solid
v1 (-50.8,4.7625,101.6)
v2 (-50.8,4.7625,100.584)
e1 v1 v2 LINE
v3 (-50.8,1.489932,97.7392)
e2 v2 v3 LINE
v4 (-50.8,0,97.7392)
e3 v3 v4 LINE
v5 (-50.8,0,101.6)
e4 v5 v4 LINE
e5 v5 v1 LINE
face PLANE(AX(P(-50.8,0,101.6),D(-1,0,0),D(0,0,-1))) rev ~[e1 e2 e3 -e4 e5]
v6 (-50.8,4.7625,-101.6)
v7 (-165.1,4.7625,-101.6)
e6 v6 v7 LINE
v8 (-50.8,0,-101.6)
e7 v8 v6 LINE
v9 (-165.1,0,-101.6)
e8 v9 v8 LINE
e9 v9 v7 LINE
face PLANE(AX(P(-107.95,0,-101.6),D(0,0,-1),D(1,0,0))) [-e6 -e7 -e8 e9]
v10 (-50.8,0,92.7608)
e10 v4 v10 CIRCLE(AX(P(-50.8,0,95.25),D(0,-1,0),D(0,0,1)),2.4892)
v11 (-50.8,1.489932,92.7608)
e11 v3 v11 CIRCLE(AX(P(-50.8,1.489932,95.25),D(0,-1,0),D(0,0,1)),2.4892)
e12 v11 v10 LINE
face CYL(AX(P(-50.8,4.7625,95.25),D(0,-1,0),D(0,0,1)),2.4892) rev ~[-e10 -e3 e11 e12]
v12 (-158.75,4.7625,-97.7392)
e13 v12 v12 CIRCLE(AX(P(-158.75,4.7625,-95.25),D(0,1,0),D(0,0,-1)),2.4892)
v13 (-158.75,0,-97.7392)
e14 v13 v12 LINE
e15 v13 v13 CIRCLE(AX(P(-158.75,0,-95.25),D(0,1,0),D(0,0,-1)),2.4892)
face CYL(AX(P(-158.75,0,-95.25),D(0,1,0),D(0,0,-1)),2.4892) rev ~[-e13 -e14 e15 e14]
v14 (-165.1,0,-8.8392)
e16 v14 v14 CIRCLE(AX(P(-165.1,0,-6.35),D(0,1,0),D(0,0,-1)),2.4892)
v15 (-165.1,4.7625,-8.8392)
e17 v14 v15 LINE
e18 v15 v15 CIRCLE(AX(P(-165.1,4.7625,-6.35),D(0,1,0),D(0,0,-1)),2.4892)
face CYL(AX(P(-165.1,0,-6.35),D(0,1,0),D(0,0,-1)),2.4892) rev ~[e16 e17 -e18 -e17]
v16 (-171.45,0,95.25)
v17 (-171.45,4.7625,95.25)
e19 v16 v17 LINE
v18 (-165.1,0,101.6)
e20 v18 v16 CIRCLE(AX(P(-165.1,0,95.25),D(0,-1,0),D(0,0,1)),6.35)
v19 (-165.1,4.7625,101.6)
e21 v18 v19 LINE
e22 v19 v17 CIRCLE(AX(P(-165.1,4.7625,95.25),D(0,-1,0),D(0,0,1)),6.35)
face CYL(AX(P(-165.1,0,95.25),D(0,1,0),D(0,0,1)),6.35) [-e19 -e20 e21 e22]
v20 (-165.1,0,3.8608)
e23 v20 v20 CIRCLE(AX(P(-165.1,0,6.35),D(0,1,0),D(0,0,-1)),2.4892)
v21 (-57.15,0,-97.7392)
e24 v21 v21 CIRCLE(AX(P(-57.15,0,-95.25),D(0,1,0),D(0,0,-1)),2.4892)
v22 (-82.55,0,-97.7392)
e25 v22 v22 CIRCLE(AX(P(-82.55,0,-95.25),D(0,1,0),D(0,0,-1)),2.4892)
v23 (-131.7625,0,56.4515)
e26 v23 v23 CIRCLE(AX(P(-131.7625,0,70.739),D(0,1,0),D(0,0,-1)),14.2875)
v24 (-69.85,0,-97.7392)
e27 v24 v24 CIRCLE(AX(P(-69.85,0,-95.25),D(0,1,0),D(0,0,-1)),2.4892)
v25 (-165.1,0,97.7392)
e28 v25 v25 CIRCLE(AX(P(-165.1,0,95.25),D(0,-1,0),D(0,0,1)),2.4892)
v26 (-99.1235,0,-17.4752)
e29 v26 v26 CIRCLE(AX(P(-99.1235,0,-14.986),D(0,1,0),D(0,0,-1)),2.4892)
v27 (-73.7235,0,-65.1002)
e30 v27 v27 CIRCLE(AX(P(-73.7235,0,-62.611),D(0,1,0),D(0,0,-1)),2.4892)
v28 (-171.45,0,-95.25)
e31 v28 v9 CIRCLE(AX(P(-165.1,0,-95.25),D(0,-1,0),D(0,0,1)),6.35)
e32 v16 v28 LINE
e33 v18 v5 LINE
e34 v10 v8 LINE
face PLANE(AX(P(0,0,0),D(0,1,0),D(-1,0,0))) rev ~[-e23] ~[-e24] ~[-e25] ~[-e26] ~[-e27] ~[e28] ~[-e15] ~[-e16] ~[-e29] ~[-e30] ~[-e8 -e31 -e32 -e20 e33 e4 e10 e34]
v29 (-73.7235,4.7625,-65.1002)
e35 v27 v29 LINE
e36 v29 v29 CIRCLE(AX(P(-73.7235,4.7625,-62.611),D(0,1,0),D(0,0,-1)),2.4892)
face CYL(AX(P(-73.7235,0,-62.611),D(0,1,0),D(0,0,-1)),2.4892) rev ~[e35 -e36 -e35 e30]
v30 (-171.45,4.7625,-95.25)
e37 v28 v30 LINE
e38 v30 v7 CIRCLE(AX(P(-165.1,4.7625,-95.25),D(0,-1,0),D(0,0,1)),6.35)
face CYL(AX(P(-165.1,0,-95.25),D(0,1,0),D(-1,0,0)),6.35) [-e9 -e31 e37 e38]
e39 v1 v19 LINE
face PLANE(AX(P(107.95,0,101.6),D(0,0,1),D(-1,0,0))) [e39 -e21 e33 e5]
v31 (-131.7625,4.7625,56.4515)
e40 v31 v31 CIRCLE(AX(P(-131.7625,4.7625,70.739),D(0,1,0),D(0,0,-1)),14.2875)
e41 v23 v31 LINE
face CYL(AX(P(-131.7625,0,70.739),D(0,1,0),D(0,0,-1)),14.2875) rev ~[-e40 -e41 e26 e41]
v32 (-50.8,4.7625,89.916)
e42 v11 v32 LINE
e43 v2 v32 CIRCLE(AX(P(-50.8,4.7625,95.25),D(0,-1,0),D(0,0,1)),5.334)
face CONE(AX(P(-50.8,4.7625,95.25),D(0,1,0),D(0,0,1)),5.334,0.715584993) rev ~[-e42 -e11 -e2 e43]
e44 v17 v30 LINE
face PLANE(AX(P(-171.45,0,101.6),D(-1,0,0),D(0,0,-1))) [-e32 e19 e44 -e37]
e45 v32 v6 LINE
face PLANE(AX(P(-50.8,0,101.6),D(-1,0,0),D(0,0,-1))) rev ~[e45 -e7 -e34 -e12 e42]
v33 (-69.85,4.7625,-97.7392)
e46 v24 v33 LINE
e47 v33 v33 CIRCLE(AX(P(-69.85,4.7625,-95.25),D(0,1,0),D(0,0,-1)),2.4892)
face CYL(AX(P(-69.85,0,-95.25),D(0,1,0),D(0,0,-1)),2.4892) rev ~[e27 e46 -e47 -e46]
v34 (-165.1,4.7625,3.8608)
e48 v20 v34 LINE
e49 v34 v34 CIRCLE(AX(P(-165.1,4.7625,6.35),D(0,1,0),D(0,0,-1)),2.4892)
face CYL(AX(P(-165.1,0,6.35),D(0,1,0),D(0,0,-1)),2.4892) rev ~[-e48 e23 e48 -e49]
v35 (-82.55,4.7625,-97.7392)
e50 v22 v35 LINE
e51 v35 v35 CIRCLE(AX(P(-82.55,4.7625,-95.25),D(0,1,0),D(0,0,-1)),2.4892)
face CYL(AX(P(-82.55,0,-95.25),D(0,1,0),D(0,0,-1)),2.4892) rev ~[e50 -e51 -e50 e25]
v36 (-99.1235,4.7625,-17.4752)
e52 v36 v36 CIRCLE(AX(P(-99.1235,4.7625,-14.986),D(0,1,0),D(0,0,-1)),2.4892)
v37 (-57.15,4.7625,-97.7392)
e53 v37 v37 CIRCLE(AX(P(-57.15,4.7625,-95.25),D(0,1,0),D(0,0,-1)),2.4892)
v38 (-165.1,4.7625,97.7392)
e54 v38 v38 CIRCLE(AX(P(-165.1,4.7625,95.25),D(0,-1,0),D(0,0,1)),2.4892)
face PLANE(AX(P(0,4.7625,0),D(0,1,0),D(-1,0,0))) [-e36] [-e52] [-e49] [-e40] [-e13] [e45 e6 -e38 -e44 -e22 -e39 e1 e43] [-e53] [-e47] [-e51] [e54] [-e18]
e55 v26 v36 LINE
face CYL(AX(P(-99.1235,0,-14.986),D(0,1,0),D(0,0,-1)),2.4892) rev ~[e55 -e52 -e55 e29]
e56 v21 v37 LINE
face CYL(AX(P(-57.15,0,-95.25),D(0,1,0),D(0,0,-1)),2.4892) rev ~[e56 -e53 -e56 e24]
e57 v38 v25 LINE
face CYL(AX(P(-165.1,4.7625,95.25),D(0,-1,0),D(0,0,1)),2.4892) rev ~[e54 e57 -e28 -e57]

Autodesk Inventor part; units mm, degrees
ref_plane "YZ Plane" through (0, 0, 0) normal (1, 0, 0) x (0, 1, 0)
ref_plane "XZ Plane" through (0, 0, 0) normal (0, 1, 0) x (-1, 0, 0)
ref_plane "XY Plane" through (0, 0, 0) normal (0, 0, 1) x (1, 0, 0)
sketch "Sketch1" plane through (0, 0, 0) normal (0, 1, 0) x (-1, 0, 0)
  line L0 (-107.95, 101.6) -> (107.95, 101.6)
  line L1 (107.95, 101.6) -> (107.95, -101.6) construction
  line L2 (107.95, -101.6) -> (-107.95, -101.6)
  line L3 (-107.95, -101.6) -> (-107.95, 101.6)
  line L4 (-107.95, 101.6) -> (107.95, -101.6) construction
  line L5 (107.95, 101.6) -> (-107.95, -101.6) construction
  circle A0 centre (-65.9765, 70.739) radius 28.575 construction
  line L6 (107.95, 101.6) -> (171.45, 101.6)
  line L7 (171.45, 101.6) -> (171.45, -101.6)
  line L8 (171.45, -101.6) -> (107.95, -101.6)
  line L9 (107.95, -101.6) -> (107.95, 101.6) construction
  circle A1 centre (131.7625, 70.739) radius 28.575 construction
  circle A2 centre (139.7, -44.4992) radius 30.1625 construction
  circle A3 centre (32.8287, 67.1746) radius 75.057 construction
  arc A4 (-42.5309, -101.6) -> (105.9516, 44.4492) centre (-65.9765, 70.739) ccw construction
  line L10 (139.7, -25.9224) -> (139.7, -58.8783) construction
  line L11 (157.6605, -26.5386) -> (139.7, -44.4992) construction
  point P0 (0, 0)
  point P1 (121.7395, -26.5386)
  point P2 (121.7395, -62.4597)
  point P3 (157.6605, -62.4597)
  dimension "d0" = 203.2
  dimension "d1" = 215.9
  dimension "d5" = 57.15
  dimension "d9" = 57.15
  dimension "d10" = 197.739
  dimension "d12" = 115.5112
  dimension "d13" = 60.325
  dimension "d14" = 150.114
  dimension "d15" = 172.339
  dimension "d17" = 173.9265
  dimension "d18" = 173.9265
  dimension "d28" = 25.4
  dimension "d31" = 360
  dimension "d33" = 45
  dimension "d79" = 279.4
extrude "Plate1" add sketch "Sketch1" along normal blind 4.7625
hole "Hole1" at (65.9765, 0, 70.739) at (-131.7625, 0, 70.739) direction (0, 1, 0) diameter 28.575 depth 4.7625 tip angle 118
sketch "Sketch2" plane through (0, 0, 0) normal (0, -1, 0) x (1, 0, 0)
  circle A0 centre (65.9765, 70.739) radius 14.2875 projected
  point P0 (0, 0)
  point P1 (-73.7235, -62.611)
  point P2 (-32.4485, -91.186)
  point P3 (-99.1235, -14.986)
  dimension "d41" = 165.1
  dimension "d42" = 85.725
  dimension "d43" = 161.925
  dimension "d44" = 98.425
  dimension "d45" = 139.7
  dimension "d46" = 133.35
hole "Hole3" at (-32.4485, 0, -91.186) at (-73.7235, 0, -62.611) at (-99.1235, 0, -14.986) direction (0, 1, 0) diameter 4.9784 depth 4.7625 tip angle 118 clearance for "Flat Head Machine Screw (82)" size "#10" standard "Ansi Unified Screw Threads"
sketch "Sketch3" plane through (0, 0, 0) normal (0, -1, 0) x (1, 0, 0)
  line L0 (107.95, -101.6) -> (-171.45, -101.6) projected
  line L1 (107.95, 101.6) -> (107.95, -101.6) projected
  point P0 (0, 0)
  point P1 (95.25, -76.2)
  point P2 (95.25, -25.4)
  dimension "d54" = 50.8
  dimension "d55" = 25.4
  dimension "d56" = 12.7
hole "Hole4" at (95.25, 0, -76.2) at (95.25, 0, -25.4) direction (0, 1, 0) diameter 4.9784 depth 4.7625 tip angle 118 clearance for "Flat Head Machine Screw (82)" size "#10" standard "Ansi Unified Screw Threads"
sketch "Sketch4" plane through (0, 0, 0) normal (0, -1, 0) x (1, 0, 0)
  line L0 (-171.45, -101.6) -> (-171.45, 101.6) projected
  line L1 (107.95, -101.6) -> (-171.45, -101.6) projected
  line L2 (107.95, 101.6) -> (107.95, -101.6) projected
  point P0 (0, 0)
  point P1 (-82.55, -95.25)
  point P2 (-69.85, -95.25)
  point P3 (-57.15, -95.25)
  point P4 (63.5, -95.25)
  point P5 (50.8, -95.25)
  point P6 (76.2, -95.25)
  point P7 (-158.75, -95.25)
  dimension "d64" = 12.7
  dimension "d65" = 12.7
  dimension "d66" = 88.9
  dimension "d67" = 6.35
  dimension "d68" = 6.35
  dimension "d69" = 12.7
  dimension "d70" = 12.7
  dimension "d71" = 31.75
  dimension "d141" = 12.7
hole "Hole5" at (-82.55, 0, -95.25) at (-69.85, 0, -95.25) at (-57.15, 0, -95.25) at (63.5, 0, -95.25) at (50.8, 0, -95.25) at (76.2, 0, -95.25) at (-158.75, 0, -95.25) direction (0, 1, 0) diameter 4.9784 depth 4.7625 tip angle 118 clearance for "Flat Head Machine Screw (82)" size "#10" standard "Ansi Unified Screw Threads"
fillet "Corner Round1" radius 6.35 4 edges at (-171.45, 2.3813, -101.6) (-171.45, 2.3813, 101.6) (107.95, 2.3813, -101.6) (107.95, 2.3813, 101.6)
sketch "Sketch5" plane through (0, 4.7625, 0) normal (0, -1, 0) x (1, 0, 0)
  circle A0 centre (-131.7625, 70.739) radius 14.2875 projected
  circle A1 centre (-131.7625, 70.739) radius 28.575
  circle A2 centre (65.9765, 70.739) radius 14.2875 projected
  circle A3 centre (65.9765, 70.739) radius 28.575
  line L0 (-165.1, 101.6) -> (101.6, 101.6) projected
  line L1 (-171.45, -95.25) -> (-171.45, 95.25) projected
  line L2 (107.95, 95.25) -> (107.95, -95.25) projected
  point P0 (0, 0)
  point P1 (-165.1, 95.25)
  point P2 (101.6, 95.25)
  point P3 (-50.8, 95.25)
  point P4 (-38.1, 95.25)
  point P5 (-25.4, 95.25)
  dimension "d81" = 57.15
  dimension "d82" = 57.15
  dimension "d83" = 6.35
  dimension "d84" = 6.35
  dimension "d85" = 6.35
  dimension "d86" = 114.3
  dimension "d87" = 12.7
  dimension "d88" = 12.7
hole "Hole6" at (-165.1, 4.7625, 95.25) at (101.6, 4.7625, 95.25) at (-50.8, 4.7625, 95.25) at (-25.4, 4.7625, 95.25) direction (0, -1, 0) diameter 4.9784 depth 4.7625 tip angle 118 clearance for "Flat Head Machine Screw (82)" size "#10" standard "Ansi Unified Screw Threads"
sketch "Sketch6" plane through (0, 0, 0) normal (0, -1, 0) x (1, 0, 0)
  line L0 (-171.45, -95.25) -> (-171.45, 95.25) projected
  point P0 (0, 0)
  point P1 (-165.1, -6.35)
  point P2 (-165.1, 6.35)
  dimension "d96" = 12.7
  dimension "d97" = 6.35
  dimension "d98" = 6.35
hole "Hole7" at (-165.1, 0, -6.35) at (-165.1, 0, 6.35) direction (0, 1, 0) diameter 4.9784 depth 4.7625 tip angle 118 clearance for "Flat Head Machine Screw (82)" size "#10" standard "Ansi Unified Screw Threads"
hole "Hole8" at (-25.4, 4.7625, 95.25) at (-50.8, 4.7625, 95.25) direction (0, -1, 0) diameter 4.9784 end through all countersink diameter 10.668 countersink angle 82 clearance for "Flat Head Machine Screw (82)" size "#10" standard "Ansi Unified Screw Threads"
sketch "Sketch9" plane through (0, 0, 0) normal (0, -1, 0) x (1, 0, 0)
  line L0 (101.6, -101.6) -> (-165.1, -101.6) projected
  line L1 (107.95, 101.6) -> (-50.8, 101.6)
  line L2 (-50.8, 101.6) -> (-50.8, -101.6)
  line L3 (-50.8, -101.6) -> (107.95, -101.6)
  line L4 (107.95, -101.6) -> (107.95, 101.6)
  line L5 (-165.1, 101.6) -> (101.6, 101.6) projected
  line L6 (107.95, 95.25) -> (107.95, -95.25) projected
  point P0 (0, 0)
  dimension "d153" = 158.75
extrude "Cut2" cut sketch "Sketch9" against normal blind 4.7625
properties part number "PLATE,KICKER,OUTSIDE" material "Aluminum 6061"
